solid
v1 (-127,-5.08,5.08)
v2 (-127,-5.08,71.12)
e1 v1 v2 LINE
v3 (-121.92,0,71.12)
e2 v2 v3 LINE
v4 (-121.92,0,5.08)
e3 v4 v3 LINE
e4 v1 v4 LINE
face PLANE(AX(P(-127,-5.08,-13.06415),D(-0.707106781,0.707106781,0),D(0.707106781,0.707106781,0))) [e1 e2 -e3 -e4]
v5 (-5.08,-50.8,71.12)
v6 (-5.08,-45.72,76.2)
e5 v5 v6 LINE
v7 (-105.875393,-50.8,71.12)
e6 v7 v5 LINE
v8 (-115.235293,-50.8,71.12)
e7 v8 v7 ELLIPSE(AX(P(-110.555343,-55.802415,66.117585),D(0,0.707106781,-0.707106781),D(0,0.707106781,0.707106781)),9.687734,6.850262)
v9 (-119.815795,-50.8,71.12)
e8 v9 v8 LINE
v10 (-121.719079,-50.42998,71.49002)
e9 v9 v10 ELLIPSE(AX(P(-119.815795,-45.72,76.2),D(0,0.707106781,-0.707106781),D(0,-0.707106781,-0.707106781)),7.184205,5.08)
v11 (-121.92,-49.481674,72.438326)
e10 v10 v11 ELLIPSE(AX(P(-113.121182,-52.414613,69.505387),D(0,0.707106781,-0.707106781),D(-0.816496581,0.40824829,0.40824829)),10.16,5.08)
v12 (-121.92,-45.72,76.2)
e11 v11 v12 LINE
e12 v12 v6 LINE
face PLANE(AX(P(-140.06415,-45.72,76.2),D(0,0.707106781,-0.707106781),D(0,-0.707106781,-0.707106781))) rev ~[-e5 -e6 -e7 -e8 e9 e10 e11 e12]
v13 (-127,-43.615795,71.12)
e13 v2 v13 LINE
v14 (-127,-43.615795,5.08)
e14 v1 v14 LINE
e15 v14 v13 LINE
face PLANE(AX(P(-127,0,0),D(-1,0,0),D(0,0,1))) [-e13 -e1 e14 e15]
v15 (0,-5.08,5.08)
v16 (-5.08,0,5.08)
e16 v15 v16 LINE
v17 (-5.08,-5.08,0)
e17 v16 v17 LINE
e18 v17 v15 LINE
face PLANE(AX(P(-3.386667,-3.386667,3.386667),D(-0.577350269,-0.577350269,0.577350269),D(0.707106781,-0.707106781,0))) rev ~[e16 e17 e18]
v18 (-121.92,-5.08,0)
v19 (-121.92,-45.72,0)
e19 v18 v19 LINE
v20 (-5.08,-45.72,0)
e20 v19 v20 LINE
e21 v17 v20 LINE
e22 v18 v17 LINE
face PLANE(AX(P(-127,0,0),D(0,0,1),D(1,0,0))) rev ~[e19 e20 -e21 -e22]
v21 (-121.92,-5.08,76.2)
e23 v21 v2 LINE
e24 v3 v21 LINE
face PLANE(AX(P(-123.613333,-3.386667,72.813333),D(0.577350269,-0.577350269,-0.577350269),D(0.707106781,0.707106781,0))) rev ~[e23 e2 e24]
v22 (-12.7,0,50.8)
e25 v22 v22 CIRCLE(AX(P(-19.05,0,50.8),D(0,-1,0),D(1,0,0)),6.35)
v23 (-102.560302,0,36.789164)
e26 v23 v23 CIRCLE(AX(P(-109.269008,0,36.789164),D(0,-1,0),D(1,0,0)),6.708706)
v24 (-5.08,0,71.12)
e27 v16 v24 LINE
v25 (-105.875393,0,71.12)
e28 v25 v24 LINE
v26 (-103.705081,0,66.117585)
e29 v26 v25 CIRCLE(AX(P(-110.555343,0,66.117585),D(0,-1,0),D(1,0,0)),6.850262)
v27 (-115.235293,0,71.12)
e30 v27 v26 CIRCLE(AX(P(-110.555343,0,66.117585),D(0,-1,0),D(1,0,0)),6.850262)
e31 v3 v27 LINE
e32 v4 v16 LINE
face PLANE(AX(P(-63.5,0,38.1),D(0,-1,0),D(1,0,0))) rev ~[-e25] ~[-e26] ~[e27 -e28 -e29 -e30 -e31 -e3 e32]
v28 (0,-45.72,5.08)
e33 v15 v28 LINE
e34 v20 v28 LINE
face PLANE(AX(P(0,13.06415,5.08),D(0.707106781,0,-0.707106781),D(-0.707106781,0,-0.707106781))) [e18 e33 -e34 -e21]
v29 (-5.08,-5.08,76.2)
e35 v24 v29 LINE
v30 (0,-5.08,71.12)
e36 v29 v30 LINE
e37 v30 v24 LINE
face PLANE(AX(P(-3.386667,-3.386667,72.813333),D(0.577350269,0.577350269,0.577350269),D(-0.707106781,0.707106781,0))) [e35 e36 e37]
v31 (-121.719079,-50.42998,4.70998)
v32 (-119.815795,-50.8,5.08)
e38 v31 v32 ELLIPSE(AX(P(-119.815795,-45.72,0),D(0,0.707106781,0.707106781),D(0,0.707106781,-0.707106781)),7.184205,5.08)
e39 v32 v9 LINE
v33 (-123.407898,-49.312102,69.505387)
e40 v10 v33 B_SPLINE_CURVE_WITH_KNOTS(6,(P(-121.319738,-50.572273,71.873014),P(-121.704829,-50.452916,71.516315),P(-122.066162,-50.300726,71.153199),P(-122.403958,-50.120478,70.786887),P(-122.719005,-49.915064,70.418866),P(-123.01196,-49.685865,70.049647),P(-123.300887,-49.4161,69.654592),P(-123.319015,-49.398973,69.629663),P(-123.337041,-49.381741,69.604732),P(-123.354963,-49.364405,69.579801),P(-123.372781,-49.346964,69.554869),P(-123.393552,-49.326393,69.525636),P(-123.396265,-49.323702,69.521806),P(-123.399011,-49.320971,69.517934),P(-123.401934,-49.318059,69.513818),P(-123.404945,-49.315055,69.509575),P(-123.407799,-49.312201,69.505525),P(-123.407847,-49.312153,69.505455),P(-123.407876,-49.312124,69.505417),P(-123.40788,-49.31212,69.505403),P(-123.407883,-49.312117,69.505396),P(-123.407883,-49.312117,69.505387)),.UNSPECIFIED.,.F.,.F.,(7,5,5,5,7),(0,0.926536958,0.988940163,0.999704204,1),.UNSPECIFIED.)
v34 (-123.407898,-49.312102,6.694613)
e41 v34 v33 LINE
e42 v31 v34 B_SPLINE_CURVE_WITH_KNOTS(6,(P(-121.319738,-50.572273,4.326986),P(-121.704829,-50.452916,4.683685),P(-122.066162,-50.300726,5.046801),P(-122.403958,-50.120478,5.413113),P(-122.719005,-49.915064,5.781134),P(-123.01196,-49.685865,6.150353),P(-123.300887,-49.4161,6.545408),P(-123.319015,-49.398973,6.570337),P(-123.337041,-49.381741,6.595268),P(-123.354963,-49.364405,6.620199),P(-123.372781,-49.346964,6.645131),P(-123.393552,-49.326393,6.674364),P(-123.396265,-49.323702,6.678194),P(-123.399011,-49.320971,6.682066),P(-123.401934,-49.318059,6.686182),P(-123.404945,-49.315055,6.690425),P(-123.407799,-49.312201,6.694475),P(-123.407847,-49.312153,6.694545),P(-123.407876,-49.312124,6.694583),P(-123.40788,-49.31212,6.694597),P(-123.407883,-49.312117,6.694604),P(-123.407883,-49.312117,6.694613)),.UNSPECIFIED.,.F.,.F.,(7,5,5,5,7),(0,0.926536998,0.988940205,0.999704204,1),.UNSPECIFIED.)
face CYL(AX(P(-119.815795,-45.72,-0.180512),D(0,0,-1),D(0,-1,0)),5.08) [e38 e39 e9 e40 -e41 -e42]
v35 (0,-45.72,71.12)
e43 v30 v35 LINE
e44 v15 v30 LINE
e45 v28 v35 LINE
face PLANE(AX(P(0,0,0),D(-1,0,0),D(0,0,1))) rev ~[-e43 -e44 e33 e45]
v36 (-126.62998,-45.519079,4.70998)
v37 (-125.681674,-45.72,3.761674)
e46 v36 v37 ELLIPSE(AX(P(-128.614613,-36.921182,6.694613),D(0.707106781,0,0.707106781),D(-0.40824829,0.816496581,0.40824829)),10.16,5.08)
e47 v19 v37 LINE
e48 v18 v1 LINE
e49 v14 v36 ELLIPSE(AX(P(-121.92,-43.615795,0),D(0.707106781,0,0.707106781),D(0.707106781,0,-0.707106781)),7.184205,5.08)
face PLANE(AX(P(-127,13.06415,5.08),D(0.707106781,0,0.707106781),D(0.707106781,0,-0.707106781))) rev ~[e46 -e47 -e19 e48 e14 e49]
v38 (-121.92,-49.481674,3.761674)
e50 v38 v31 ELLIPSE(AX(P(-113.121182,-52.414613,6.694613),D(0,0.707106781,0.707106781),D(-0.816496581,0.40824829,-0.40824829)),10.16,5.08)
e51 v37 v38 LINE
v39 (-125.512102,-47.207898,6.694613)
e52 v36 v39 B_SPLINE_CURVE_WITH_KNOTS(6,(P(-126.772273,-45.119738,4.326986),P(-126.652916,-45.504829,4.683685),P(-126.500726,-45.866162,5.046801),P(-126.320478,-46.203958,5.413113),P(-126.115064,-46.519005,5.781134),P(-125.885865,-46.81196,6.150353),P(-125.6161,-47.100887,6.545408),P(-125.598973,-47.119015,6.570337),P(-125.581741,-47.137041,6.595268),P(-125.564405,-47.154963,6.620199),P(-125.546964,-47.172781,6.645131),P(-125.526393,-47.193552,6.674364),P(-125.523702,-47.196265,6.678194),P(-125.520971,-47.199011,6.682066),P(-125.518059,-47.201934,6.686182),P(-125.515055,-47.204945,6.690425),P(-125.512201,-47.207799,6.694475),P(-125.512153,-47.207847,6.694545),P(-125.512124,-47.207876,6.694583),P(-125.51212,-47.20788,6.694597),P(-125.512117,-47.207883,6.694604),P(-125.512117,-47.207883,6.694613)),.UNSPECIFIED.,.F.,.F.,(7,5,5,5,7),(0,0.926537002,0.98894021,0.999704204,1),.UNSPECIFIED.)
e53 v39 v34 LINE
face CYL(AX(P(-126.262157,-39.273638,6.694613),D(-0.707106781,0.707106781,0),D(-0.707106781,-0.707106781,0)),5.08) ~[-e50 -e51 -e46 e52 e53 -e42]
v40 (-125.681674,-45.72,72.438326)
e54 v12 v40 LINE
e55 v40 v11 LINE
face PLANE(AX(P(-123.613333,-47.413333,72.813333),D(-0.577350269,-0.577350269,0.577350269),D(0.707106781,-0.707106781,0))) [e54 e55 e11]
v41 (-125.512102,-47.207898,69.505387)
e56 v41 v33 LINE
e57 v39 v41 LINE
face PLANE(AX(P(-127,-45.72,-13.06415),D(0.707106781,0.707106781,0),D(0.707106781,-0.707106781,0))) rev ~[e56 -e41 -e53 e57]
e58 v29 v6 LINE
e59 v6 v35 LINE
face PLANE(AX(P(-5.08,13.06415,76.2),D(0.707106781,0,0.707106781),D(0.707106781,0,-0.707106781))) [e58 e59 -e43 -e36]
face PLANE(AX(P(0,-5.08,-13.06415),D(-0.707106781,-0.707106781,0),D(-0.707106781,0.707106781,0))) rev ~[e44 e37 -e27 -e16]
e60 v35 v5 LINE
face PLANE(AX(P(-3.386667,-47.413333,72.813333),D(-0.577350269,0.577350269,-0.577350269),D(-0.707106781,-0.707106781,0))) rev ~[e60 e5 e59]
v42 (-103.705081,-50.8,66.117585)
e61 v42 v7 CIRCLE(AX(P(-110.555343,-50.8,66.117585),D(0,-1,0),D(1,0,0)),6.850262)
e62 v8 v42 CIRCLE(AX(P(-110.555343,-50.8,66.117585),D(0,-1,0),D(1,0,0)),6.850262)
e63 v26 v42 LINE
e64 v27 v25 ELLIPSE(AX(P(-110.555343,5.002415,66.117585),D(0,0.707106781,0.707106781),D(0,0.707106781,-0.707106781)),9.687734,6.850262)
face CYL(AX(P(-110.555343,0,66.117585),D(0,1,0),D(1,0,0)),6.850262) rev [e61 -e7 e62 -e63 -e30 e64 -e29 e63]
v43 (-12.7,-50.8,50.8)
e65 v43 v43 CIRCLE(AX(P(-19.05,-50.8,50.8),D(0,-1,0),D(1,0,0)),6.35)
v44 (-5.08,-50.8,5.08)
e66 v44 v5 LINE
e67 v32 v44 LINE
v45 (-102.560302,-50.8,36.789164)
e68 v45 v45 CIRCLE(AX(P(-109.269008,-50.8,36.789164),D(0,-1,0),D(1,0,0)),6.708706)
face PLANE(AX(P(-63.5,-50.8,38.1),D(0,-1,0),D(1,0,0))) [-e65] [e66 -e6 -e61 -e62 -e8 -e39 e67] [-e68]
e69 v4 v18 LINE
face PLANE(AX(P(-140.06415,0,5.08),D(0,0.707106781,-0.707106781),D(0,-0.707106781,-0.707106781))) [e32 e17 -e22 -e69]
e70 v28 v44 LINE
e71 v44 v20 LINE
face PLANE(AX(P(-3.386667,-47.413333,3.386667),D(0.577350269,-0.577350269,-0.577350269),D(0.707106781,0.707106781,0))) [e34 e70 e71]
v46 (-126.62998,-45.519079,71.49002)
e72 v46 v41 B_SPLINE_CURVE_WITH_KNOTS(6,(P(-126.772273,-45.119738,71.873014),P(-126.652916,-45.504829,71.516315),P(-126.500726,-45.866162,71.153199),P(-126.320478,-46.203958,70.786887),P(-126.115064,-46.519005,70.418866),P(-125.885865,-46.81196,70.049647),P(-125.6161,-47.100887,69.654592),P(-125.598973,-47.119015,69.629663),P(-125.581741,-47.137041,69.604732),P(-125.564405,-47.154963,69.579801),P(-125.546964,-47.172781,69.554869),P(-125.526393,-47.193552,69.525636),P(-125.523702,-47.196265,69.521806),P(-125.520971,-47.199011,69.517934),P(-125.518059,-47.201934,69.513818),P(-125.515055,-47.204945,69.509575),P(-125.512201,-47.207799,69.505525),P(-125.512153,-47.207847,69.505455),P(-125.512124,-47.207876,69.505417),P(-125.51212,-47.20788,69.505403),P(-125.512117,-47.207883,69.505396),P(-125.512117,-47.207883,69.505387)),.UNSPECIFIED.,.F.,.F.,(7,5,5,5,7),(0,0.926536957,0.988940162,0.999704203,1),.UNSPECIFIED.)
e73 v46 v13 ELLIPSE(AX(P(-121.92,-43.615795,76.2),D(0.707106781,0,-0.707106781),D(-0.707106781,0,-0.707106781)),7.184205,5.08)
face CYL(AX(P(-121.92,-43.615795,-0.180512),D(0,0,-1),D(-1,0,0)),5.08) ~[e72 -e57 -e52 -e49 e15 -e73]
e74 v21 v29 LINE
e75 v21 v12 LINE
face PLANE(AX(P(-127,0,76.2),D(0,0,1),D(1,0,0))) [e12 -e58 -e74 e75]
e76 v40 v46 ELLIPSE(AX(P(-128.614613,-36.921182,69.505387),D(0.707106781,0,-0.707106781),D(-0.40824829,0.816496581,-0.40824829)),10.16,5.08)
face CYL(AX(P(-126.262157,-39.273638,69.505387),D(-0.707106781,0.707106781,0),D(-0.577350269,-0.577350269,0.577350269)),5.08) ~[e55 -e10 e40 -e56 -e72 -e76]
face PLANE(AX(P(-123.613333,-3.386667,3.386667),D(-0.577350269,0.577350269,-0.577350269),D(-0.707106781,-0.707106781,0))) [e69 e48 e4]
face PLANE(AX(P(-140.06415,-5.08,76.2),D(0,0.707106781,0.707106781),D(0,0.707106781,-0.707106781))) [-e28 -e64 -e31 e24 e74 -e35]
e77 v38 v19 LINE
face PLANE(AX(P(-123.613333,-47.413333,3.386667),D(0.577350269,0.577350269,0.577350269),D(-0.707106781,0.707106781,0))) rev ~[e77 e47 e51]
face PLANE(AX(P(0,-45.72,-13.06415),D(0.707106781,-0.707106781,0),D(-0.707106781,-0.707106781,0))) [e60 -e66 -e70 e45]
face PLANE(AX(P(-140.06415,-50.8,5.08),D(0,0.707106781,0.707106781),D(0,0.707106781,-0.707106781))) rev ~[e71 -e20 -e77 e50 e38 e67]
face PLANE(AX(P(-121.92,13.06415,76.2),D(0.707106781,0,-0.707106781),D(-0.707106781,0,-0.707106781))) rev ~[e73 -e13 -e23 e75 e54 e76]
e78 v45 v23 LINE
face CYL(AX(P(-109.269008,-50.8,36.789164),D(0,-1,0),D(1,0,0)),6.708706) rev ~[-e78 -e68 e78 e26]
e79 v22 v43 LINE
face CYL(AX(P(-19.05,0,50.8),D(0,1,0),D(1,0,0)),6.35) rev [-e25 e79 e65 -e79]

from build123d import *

# Parameters (mm, degrees)
F0_W         = 127
F0_H         = 76.2
F0_R         = 6.8502620854
F0_R_2       = 6.35
F1_DEPTH     = 50.8
F2_R         = 6.7087058048
F3_DEPTH     = 127
F4_T1_DEPTH  = 6.4524666085
F4_T3_DEPTH  = 6.4524666085
F4_T5_DEPTH  = 6.4524666085
F4_T7_DEPTH  = 6.4524666085
F4_T9_DEPTH  = 6.4524666085
F4_T11_DEPTH = 6.4524666085
F4_T13_DEPTH = 6.4524666085
F4_T15_DEPTH = 6.4524666085
F4_T17_DEPTH = 102.3282991577
F4_T19_DEPTH = 153.1282991577
F4_T21_DEPTH = 76.9282991577
F5_T1_DEPTH  = 15.2572709249
F5_T3_DEPTH  = 76.5610244843


# Not quite as in the source:
# - a fillet or chamfer that OpenCascade refuses, or shapes differently, is made with other operations: its cross-section is extruded or revolved along the edge and cut away or added


with BuildPart() as f1:
    # F0 (on Front) → F1 (new body)
    with BuildSketch(Plane.XZ):
        with Locations((-63.5, 38.1)):
            Rectangle(F0_W, F0_H)
        with Locations((-110.5553433299, 66.1175847054)):
            Circle(F0_R, mode=Mode.SUBTRACT)
        with Locations((-19.05, 50.8)):
            Circle(F0_R_2, mode=Mode.SUBTRACT)
    extrude(amount=F1_DEPTH)

    # F2 (on face) → F3 (cut)
    with BuildSketch(Plane.XZ.offset(50.8)):
        with Locations((-109.2690080404, 36.7891639471)):
            Circle(F2_R)
    extrude(amount=-F3_DEPTH, mode=Mode.SUBTRACT)

    # F4: chamfer of 5.08 on 12 edges, made by hand

    # F4_s2 → F4_t1 (cut)
    with BuildSketch(Plane(origin=(-81.28, -81.28, 81.28), x_dir=(0.7071067812, -0.7071067812, 0), z_dir=(-0.5773502692, -0.5773502692, 0.5773502692))):
        Polygon((-53.8815367264, -6.2217039467), (-57.4736391748, -12.4434078933), (-50.289434278, -12.4434078933), align=None)
    extrude(amount=F4_T1_DEPTH, mode=Mode.SUBTRACT)

    # F4_s4 → F4_t3 (cut)
    with BuildSketch(Plane(origin=(-55.88, -55.88, -55.88), x_dir=(0.7071067812, -0.7071067812, 0), z_dir=(-0.5773502692, -0.5773502692, -0.5773502692))):
        Polygon((-57.4736391748, 74.66044736), (-50.289434278, 74.66044736), (-53.8815367264, 68.4387434134), align=None)
    extrude(amount=F4_T3_DEPTH, mode=Mode.SUBTRACT)

    # F4_s6 → F4_t5 (cut)
    with BuildSketch(Plane(origin=(38.9466666667, -38.9466666667, 38.9466666667), x_dir=(0.7071067812, 0.7071067812, 0), z_dir=(0.5773502692, -0.5773502692, 0.5773502692))):
        Polygon((-35.9210244843, 45.6258289422), (-32.3289220358, 39.4041249956), (-39.5131269327, 39.4041249956), align=None)
    extrude(amount=F4_T5_DEPTH, mode=Mode.SUBTRACT)

    # F4_s8 → F4_t7 (cut)
    with BuildSketch(Plane(origin=(-64.3466666667, 64.3466666667, 64.3466666667), x_dir=(-0.7071067812, -0.7071067812, 0), z_dir=(-0.5773502692, 0.5773502692, 0.5773502692))):
        Polygon((89.8025612107, 14.5173092089), (93.3946636591, 8.2956052622), (86.2104587623, 8.2956052622), align=None)
    extrude(amount=F4_T7_DEPTH, mode=Mode.SUBTRACT)

    # F4_s10 → F4_t9 (cut)
    with BuildSketch(Plane(origin=(-38.9466666667, 38.9466666667, -38.9466666667), x_dir=(-0.7071067812, -0.7071067812, 0), z_dir=(-0.5773502692, 0.5773502692, -0.5773502692))):
        Polygon((93.3946636591, 53.9214342045), (86.2104587623, 53.9214342045), (89.8025612107, 47.6997302578), align=None)
    extrude(amount=F4_T9_DEPTH, mode=Mode.SUBTRACT)

    # F4_s12 → F4_t11 (cut)
    with BuildSketch(Plane(origin=(22.0133333333, 22.0133333333, 22.0133333333), x_dir=(-0.7071067812, 0.7071067812, 0), z_dir=(0.5773502692, 0.5773502692, 0.5773502692))):
        Polygon((0, 66.3648420978), (-3.5921024484, 60.1431381511), (3.5921024484, 60.1431381511), align=None)
    extrude(amount=F4_T11_DEPTH, mode=Mode.SUBTRACT)

    # F4_s14 → F4_t13 (cut)
    with BuildSketch(Plane(origin=(-3.3866666667, -3.3866666667, 3.3866666667), x_dir=(-0.7071067812, 0.7071067812, 0), z_dir=(0.5773502692, 0.5773502692, -0.5773502692))):
        Polygon((-3.5921024484, 2.0739013156), (3.5921024484, 2.0739013156), (0, -4.1478026311), align=None)
    extrude(amount=F4_T13_DEPTH, mode=Mode.SUBTRACT)

    # F4_s16 → F4_t15 (cut)
    with BuildSketch(Plane(origin=(13.5466666667, -13.5466666667, -13.5466666667), x_dir=(0.7071067812, 0.7071067812, 0), z_dir=(0.5773502692, -0.5773502692, -0.5773502692))):
        Polygon((-32.3289220358, 22.8129144711), (-39.5131269327, 22.8129144711), (-35.9210244843, 16.5912105245), align=None)
    extrude(amount=F4_T15_DEPTH, mode=Mode.SUBTRACT)

    # F4_s18 → F4_t17 (cut)
    with BuildSketch(Plane.XY.offset(-13.0641495789)):
        Polygon((-127, -45.72), (-121.92, -50.8), (-127, -50.8), align=None)
        Polygon((-127, -5.08), (-121.92, 0), (-127, 0), align=None)
        Polygon((0, -45.72), (-5.08, -50.8), (0, -50.8), align=None)
        Polygon((0, -5.08), (-5.08, 0), (0, 0), align=None)
    extrude(amount=F4_T17_DEPTH, mode=Mode.SUBTRACT)

    # F4_s20 → F4_t19 (cut)
    with BuildSketch(Plane.YZ.offset(-140.0641495789)):
        Polygon((-45.72, 76.2), (-50.8, 71.12), (-50.8, 76.2), align=None)
        Polygon((-5.08, 76.2), (0, 71.12), (0, 76.2), align=None)
        Polygon((0, 5.08), (-5.08, 0), (0, 0), align=None)
        Polygon((-50.8, 5.08), (-45.72, 0), (-50.8, 0), align=None)
    extrude(amount=F4_T19_DEPTH, mode=Mode.SUBTRACT)

    # F4_s22 → F4_t21 (cut)
    with BuildSketch(Plane.XZ.offset(-13.0641495789)):
        Polygon((-127, 5.08), (-121.92, 0), (-127, 0), align=None)
        Polygon((-121.92, 76.2), (-127, 71.12), (-127, 76.2), align=None)
        Polygon((0, 5.08), (-5.08, 0), (0, 0), align=None)
        Polygon((-5.08, 76.2), (0, 71.12), (0, 76.2), align=None)
    extrude(amount=F4_T21_DEPTH, mode=Mode.SUBTRACT)

    # F5: fillet of radius 5.08 on 4 edges, made by hand

    # F5_s2 → F5_t1 (cut)
    with BuildSketch(Plane(origin=(-43.4942598667, 43.4942598667, 0), x_dir=(0, 0, 1), z_dir=(0.7071067812, -0.7071067812, 0))):
        with BuildLine():
            ThreePointArc((6.6946132056, 122.1314832465), (5.1558535372, 121.892827965), (3.7616738381, 121.1992858777))
            Line((3.7616738381, 121.1992858777), (5.08, 122.1314832465))
            Line((5.08, 122.1314832465), (6.6946132056, 122.1314832465))
        make_face()
        with BuildLine():
            ThreePointArc((72.4383261619, 121.1992858777), (71.0441464628, 121.892827965), (69.5053867944, 122.1314832465))
            Line((69.5053867944, 122.1314832465), (71.12, 122.1314832465))
            Line((71.12, 122.1314832465), (72.4383261619, 121.1992858777))
        make_face()
    extrude(amount=F5_T1_DEPTH, mode=Mode.SUBTRACT)

    # F5_s4 → F5_t3 (cut)
    with BuildSketch(Plane.XY.offset(-0.1805122422)):
        with BuildLine():
            ThreePointArc((-119.8157951031, -50.8), (-121.7598269396, -50.4133080252), (-123.4078975516, -49.3121024484))
            Line((-123.4078975516, -49.3121024484), (-121.92, -50.8))
            Line((-121.92, -50.8), (-119.8157951031, -50.8))
        make_face()
        with BuildLine():
            ThreePointArc((-127, -43.6157951031), (-126.6133080252, -45.5598269396), (-125.5121024484, -47.2078975516))
            Line((-125.5121024484, -47.2078975516), (-127, -45.72))
            Line((-127, -45.72), (-127, -43.6157951031))
        make_face()
    extrude(amount=F5_T3_DEPTH, mode=Mode.SUBTRACT)


solid = f1.part
